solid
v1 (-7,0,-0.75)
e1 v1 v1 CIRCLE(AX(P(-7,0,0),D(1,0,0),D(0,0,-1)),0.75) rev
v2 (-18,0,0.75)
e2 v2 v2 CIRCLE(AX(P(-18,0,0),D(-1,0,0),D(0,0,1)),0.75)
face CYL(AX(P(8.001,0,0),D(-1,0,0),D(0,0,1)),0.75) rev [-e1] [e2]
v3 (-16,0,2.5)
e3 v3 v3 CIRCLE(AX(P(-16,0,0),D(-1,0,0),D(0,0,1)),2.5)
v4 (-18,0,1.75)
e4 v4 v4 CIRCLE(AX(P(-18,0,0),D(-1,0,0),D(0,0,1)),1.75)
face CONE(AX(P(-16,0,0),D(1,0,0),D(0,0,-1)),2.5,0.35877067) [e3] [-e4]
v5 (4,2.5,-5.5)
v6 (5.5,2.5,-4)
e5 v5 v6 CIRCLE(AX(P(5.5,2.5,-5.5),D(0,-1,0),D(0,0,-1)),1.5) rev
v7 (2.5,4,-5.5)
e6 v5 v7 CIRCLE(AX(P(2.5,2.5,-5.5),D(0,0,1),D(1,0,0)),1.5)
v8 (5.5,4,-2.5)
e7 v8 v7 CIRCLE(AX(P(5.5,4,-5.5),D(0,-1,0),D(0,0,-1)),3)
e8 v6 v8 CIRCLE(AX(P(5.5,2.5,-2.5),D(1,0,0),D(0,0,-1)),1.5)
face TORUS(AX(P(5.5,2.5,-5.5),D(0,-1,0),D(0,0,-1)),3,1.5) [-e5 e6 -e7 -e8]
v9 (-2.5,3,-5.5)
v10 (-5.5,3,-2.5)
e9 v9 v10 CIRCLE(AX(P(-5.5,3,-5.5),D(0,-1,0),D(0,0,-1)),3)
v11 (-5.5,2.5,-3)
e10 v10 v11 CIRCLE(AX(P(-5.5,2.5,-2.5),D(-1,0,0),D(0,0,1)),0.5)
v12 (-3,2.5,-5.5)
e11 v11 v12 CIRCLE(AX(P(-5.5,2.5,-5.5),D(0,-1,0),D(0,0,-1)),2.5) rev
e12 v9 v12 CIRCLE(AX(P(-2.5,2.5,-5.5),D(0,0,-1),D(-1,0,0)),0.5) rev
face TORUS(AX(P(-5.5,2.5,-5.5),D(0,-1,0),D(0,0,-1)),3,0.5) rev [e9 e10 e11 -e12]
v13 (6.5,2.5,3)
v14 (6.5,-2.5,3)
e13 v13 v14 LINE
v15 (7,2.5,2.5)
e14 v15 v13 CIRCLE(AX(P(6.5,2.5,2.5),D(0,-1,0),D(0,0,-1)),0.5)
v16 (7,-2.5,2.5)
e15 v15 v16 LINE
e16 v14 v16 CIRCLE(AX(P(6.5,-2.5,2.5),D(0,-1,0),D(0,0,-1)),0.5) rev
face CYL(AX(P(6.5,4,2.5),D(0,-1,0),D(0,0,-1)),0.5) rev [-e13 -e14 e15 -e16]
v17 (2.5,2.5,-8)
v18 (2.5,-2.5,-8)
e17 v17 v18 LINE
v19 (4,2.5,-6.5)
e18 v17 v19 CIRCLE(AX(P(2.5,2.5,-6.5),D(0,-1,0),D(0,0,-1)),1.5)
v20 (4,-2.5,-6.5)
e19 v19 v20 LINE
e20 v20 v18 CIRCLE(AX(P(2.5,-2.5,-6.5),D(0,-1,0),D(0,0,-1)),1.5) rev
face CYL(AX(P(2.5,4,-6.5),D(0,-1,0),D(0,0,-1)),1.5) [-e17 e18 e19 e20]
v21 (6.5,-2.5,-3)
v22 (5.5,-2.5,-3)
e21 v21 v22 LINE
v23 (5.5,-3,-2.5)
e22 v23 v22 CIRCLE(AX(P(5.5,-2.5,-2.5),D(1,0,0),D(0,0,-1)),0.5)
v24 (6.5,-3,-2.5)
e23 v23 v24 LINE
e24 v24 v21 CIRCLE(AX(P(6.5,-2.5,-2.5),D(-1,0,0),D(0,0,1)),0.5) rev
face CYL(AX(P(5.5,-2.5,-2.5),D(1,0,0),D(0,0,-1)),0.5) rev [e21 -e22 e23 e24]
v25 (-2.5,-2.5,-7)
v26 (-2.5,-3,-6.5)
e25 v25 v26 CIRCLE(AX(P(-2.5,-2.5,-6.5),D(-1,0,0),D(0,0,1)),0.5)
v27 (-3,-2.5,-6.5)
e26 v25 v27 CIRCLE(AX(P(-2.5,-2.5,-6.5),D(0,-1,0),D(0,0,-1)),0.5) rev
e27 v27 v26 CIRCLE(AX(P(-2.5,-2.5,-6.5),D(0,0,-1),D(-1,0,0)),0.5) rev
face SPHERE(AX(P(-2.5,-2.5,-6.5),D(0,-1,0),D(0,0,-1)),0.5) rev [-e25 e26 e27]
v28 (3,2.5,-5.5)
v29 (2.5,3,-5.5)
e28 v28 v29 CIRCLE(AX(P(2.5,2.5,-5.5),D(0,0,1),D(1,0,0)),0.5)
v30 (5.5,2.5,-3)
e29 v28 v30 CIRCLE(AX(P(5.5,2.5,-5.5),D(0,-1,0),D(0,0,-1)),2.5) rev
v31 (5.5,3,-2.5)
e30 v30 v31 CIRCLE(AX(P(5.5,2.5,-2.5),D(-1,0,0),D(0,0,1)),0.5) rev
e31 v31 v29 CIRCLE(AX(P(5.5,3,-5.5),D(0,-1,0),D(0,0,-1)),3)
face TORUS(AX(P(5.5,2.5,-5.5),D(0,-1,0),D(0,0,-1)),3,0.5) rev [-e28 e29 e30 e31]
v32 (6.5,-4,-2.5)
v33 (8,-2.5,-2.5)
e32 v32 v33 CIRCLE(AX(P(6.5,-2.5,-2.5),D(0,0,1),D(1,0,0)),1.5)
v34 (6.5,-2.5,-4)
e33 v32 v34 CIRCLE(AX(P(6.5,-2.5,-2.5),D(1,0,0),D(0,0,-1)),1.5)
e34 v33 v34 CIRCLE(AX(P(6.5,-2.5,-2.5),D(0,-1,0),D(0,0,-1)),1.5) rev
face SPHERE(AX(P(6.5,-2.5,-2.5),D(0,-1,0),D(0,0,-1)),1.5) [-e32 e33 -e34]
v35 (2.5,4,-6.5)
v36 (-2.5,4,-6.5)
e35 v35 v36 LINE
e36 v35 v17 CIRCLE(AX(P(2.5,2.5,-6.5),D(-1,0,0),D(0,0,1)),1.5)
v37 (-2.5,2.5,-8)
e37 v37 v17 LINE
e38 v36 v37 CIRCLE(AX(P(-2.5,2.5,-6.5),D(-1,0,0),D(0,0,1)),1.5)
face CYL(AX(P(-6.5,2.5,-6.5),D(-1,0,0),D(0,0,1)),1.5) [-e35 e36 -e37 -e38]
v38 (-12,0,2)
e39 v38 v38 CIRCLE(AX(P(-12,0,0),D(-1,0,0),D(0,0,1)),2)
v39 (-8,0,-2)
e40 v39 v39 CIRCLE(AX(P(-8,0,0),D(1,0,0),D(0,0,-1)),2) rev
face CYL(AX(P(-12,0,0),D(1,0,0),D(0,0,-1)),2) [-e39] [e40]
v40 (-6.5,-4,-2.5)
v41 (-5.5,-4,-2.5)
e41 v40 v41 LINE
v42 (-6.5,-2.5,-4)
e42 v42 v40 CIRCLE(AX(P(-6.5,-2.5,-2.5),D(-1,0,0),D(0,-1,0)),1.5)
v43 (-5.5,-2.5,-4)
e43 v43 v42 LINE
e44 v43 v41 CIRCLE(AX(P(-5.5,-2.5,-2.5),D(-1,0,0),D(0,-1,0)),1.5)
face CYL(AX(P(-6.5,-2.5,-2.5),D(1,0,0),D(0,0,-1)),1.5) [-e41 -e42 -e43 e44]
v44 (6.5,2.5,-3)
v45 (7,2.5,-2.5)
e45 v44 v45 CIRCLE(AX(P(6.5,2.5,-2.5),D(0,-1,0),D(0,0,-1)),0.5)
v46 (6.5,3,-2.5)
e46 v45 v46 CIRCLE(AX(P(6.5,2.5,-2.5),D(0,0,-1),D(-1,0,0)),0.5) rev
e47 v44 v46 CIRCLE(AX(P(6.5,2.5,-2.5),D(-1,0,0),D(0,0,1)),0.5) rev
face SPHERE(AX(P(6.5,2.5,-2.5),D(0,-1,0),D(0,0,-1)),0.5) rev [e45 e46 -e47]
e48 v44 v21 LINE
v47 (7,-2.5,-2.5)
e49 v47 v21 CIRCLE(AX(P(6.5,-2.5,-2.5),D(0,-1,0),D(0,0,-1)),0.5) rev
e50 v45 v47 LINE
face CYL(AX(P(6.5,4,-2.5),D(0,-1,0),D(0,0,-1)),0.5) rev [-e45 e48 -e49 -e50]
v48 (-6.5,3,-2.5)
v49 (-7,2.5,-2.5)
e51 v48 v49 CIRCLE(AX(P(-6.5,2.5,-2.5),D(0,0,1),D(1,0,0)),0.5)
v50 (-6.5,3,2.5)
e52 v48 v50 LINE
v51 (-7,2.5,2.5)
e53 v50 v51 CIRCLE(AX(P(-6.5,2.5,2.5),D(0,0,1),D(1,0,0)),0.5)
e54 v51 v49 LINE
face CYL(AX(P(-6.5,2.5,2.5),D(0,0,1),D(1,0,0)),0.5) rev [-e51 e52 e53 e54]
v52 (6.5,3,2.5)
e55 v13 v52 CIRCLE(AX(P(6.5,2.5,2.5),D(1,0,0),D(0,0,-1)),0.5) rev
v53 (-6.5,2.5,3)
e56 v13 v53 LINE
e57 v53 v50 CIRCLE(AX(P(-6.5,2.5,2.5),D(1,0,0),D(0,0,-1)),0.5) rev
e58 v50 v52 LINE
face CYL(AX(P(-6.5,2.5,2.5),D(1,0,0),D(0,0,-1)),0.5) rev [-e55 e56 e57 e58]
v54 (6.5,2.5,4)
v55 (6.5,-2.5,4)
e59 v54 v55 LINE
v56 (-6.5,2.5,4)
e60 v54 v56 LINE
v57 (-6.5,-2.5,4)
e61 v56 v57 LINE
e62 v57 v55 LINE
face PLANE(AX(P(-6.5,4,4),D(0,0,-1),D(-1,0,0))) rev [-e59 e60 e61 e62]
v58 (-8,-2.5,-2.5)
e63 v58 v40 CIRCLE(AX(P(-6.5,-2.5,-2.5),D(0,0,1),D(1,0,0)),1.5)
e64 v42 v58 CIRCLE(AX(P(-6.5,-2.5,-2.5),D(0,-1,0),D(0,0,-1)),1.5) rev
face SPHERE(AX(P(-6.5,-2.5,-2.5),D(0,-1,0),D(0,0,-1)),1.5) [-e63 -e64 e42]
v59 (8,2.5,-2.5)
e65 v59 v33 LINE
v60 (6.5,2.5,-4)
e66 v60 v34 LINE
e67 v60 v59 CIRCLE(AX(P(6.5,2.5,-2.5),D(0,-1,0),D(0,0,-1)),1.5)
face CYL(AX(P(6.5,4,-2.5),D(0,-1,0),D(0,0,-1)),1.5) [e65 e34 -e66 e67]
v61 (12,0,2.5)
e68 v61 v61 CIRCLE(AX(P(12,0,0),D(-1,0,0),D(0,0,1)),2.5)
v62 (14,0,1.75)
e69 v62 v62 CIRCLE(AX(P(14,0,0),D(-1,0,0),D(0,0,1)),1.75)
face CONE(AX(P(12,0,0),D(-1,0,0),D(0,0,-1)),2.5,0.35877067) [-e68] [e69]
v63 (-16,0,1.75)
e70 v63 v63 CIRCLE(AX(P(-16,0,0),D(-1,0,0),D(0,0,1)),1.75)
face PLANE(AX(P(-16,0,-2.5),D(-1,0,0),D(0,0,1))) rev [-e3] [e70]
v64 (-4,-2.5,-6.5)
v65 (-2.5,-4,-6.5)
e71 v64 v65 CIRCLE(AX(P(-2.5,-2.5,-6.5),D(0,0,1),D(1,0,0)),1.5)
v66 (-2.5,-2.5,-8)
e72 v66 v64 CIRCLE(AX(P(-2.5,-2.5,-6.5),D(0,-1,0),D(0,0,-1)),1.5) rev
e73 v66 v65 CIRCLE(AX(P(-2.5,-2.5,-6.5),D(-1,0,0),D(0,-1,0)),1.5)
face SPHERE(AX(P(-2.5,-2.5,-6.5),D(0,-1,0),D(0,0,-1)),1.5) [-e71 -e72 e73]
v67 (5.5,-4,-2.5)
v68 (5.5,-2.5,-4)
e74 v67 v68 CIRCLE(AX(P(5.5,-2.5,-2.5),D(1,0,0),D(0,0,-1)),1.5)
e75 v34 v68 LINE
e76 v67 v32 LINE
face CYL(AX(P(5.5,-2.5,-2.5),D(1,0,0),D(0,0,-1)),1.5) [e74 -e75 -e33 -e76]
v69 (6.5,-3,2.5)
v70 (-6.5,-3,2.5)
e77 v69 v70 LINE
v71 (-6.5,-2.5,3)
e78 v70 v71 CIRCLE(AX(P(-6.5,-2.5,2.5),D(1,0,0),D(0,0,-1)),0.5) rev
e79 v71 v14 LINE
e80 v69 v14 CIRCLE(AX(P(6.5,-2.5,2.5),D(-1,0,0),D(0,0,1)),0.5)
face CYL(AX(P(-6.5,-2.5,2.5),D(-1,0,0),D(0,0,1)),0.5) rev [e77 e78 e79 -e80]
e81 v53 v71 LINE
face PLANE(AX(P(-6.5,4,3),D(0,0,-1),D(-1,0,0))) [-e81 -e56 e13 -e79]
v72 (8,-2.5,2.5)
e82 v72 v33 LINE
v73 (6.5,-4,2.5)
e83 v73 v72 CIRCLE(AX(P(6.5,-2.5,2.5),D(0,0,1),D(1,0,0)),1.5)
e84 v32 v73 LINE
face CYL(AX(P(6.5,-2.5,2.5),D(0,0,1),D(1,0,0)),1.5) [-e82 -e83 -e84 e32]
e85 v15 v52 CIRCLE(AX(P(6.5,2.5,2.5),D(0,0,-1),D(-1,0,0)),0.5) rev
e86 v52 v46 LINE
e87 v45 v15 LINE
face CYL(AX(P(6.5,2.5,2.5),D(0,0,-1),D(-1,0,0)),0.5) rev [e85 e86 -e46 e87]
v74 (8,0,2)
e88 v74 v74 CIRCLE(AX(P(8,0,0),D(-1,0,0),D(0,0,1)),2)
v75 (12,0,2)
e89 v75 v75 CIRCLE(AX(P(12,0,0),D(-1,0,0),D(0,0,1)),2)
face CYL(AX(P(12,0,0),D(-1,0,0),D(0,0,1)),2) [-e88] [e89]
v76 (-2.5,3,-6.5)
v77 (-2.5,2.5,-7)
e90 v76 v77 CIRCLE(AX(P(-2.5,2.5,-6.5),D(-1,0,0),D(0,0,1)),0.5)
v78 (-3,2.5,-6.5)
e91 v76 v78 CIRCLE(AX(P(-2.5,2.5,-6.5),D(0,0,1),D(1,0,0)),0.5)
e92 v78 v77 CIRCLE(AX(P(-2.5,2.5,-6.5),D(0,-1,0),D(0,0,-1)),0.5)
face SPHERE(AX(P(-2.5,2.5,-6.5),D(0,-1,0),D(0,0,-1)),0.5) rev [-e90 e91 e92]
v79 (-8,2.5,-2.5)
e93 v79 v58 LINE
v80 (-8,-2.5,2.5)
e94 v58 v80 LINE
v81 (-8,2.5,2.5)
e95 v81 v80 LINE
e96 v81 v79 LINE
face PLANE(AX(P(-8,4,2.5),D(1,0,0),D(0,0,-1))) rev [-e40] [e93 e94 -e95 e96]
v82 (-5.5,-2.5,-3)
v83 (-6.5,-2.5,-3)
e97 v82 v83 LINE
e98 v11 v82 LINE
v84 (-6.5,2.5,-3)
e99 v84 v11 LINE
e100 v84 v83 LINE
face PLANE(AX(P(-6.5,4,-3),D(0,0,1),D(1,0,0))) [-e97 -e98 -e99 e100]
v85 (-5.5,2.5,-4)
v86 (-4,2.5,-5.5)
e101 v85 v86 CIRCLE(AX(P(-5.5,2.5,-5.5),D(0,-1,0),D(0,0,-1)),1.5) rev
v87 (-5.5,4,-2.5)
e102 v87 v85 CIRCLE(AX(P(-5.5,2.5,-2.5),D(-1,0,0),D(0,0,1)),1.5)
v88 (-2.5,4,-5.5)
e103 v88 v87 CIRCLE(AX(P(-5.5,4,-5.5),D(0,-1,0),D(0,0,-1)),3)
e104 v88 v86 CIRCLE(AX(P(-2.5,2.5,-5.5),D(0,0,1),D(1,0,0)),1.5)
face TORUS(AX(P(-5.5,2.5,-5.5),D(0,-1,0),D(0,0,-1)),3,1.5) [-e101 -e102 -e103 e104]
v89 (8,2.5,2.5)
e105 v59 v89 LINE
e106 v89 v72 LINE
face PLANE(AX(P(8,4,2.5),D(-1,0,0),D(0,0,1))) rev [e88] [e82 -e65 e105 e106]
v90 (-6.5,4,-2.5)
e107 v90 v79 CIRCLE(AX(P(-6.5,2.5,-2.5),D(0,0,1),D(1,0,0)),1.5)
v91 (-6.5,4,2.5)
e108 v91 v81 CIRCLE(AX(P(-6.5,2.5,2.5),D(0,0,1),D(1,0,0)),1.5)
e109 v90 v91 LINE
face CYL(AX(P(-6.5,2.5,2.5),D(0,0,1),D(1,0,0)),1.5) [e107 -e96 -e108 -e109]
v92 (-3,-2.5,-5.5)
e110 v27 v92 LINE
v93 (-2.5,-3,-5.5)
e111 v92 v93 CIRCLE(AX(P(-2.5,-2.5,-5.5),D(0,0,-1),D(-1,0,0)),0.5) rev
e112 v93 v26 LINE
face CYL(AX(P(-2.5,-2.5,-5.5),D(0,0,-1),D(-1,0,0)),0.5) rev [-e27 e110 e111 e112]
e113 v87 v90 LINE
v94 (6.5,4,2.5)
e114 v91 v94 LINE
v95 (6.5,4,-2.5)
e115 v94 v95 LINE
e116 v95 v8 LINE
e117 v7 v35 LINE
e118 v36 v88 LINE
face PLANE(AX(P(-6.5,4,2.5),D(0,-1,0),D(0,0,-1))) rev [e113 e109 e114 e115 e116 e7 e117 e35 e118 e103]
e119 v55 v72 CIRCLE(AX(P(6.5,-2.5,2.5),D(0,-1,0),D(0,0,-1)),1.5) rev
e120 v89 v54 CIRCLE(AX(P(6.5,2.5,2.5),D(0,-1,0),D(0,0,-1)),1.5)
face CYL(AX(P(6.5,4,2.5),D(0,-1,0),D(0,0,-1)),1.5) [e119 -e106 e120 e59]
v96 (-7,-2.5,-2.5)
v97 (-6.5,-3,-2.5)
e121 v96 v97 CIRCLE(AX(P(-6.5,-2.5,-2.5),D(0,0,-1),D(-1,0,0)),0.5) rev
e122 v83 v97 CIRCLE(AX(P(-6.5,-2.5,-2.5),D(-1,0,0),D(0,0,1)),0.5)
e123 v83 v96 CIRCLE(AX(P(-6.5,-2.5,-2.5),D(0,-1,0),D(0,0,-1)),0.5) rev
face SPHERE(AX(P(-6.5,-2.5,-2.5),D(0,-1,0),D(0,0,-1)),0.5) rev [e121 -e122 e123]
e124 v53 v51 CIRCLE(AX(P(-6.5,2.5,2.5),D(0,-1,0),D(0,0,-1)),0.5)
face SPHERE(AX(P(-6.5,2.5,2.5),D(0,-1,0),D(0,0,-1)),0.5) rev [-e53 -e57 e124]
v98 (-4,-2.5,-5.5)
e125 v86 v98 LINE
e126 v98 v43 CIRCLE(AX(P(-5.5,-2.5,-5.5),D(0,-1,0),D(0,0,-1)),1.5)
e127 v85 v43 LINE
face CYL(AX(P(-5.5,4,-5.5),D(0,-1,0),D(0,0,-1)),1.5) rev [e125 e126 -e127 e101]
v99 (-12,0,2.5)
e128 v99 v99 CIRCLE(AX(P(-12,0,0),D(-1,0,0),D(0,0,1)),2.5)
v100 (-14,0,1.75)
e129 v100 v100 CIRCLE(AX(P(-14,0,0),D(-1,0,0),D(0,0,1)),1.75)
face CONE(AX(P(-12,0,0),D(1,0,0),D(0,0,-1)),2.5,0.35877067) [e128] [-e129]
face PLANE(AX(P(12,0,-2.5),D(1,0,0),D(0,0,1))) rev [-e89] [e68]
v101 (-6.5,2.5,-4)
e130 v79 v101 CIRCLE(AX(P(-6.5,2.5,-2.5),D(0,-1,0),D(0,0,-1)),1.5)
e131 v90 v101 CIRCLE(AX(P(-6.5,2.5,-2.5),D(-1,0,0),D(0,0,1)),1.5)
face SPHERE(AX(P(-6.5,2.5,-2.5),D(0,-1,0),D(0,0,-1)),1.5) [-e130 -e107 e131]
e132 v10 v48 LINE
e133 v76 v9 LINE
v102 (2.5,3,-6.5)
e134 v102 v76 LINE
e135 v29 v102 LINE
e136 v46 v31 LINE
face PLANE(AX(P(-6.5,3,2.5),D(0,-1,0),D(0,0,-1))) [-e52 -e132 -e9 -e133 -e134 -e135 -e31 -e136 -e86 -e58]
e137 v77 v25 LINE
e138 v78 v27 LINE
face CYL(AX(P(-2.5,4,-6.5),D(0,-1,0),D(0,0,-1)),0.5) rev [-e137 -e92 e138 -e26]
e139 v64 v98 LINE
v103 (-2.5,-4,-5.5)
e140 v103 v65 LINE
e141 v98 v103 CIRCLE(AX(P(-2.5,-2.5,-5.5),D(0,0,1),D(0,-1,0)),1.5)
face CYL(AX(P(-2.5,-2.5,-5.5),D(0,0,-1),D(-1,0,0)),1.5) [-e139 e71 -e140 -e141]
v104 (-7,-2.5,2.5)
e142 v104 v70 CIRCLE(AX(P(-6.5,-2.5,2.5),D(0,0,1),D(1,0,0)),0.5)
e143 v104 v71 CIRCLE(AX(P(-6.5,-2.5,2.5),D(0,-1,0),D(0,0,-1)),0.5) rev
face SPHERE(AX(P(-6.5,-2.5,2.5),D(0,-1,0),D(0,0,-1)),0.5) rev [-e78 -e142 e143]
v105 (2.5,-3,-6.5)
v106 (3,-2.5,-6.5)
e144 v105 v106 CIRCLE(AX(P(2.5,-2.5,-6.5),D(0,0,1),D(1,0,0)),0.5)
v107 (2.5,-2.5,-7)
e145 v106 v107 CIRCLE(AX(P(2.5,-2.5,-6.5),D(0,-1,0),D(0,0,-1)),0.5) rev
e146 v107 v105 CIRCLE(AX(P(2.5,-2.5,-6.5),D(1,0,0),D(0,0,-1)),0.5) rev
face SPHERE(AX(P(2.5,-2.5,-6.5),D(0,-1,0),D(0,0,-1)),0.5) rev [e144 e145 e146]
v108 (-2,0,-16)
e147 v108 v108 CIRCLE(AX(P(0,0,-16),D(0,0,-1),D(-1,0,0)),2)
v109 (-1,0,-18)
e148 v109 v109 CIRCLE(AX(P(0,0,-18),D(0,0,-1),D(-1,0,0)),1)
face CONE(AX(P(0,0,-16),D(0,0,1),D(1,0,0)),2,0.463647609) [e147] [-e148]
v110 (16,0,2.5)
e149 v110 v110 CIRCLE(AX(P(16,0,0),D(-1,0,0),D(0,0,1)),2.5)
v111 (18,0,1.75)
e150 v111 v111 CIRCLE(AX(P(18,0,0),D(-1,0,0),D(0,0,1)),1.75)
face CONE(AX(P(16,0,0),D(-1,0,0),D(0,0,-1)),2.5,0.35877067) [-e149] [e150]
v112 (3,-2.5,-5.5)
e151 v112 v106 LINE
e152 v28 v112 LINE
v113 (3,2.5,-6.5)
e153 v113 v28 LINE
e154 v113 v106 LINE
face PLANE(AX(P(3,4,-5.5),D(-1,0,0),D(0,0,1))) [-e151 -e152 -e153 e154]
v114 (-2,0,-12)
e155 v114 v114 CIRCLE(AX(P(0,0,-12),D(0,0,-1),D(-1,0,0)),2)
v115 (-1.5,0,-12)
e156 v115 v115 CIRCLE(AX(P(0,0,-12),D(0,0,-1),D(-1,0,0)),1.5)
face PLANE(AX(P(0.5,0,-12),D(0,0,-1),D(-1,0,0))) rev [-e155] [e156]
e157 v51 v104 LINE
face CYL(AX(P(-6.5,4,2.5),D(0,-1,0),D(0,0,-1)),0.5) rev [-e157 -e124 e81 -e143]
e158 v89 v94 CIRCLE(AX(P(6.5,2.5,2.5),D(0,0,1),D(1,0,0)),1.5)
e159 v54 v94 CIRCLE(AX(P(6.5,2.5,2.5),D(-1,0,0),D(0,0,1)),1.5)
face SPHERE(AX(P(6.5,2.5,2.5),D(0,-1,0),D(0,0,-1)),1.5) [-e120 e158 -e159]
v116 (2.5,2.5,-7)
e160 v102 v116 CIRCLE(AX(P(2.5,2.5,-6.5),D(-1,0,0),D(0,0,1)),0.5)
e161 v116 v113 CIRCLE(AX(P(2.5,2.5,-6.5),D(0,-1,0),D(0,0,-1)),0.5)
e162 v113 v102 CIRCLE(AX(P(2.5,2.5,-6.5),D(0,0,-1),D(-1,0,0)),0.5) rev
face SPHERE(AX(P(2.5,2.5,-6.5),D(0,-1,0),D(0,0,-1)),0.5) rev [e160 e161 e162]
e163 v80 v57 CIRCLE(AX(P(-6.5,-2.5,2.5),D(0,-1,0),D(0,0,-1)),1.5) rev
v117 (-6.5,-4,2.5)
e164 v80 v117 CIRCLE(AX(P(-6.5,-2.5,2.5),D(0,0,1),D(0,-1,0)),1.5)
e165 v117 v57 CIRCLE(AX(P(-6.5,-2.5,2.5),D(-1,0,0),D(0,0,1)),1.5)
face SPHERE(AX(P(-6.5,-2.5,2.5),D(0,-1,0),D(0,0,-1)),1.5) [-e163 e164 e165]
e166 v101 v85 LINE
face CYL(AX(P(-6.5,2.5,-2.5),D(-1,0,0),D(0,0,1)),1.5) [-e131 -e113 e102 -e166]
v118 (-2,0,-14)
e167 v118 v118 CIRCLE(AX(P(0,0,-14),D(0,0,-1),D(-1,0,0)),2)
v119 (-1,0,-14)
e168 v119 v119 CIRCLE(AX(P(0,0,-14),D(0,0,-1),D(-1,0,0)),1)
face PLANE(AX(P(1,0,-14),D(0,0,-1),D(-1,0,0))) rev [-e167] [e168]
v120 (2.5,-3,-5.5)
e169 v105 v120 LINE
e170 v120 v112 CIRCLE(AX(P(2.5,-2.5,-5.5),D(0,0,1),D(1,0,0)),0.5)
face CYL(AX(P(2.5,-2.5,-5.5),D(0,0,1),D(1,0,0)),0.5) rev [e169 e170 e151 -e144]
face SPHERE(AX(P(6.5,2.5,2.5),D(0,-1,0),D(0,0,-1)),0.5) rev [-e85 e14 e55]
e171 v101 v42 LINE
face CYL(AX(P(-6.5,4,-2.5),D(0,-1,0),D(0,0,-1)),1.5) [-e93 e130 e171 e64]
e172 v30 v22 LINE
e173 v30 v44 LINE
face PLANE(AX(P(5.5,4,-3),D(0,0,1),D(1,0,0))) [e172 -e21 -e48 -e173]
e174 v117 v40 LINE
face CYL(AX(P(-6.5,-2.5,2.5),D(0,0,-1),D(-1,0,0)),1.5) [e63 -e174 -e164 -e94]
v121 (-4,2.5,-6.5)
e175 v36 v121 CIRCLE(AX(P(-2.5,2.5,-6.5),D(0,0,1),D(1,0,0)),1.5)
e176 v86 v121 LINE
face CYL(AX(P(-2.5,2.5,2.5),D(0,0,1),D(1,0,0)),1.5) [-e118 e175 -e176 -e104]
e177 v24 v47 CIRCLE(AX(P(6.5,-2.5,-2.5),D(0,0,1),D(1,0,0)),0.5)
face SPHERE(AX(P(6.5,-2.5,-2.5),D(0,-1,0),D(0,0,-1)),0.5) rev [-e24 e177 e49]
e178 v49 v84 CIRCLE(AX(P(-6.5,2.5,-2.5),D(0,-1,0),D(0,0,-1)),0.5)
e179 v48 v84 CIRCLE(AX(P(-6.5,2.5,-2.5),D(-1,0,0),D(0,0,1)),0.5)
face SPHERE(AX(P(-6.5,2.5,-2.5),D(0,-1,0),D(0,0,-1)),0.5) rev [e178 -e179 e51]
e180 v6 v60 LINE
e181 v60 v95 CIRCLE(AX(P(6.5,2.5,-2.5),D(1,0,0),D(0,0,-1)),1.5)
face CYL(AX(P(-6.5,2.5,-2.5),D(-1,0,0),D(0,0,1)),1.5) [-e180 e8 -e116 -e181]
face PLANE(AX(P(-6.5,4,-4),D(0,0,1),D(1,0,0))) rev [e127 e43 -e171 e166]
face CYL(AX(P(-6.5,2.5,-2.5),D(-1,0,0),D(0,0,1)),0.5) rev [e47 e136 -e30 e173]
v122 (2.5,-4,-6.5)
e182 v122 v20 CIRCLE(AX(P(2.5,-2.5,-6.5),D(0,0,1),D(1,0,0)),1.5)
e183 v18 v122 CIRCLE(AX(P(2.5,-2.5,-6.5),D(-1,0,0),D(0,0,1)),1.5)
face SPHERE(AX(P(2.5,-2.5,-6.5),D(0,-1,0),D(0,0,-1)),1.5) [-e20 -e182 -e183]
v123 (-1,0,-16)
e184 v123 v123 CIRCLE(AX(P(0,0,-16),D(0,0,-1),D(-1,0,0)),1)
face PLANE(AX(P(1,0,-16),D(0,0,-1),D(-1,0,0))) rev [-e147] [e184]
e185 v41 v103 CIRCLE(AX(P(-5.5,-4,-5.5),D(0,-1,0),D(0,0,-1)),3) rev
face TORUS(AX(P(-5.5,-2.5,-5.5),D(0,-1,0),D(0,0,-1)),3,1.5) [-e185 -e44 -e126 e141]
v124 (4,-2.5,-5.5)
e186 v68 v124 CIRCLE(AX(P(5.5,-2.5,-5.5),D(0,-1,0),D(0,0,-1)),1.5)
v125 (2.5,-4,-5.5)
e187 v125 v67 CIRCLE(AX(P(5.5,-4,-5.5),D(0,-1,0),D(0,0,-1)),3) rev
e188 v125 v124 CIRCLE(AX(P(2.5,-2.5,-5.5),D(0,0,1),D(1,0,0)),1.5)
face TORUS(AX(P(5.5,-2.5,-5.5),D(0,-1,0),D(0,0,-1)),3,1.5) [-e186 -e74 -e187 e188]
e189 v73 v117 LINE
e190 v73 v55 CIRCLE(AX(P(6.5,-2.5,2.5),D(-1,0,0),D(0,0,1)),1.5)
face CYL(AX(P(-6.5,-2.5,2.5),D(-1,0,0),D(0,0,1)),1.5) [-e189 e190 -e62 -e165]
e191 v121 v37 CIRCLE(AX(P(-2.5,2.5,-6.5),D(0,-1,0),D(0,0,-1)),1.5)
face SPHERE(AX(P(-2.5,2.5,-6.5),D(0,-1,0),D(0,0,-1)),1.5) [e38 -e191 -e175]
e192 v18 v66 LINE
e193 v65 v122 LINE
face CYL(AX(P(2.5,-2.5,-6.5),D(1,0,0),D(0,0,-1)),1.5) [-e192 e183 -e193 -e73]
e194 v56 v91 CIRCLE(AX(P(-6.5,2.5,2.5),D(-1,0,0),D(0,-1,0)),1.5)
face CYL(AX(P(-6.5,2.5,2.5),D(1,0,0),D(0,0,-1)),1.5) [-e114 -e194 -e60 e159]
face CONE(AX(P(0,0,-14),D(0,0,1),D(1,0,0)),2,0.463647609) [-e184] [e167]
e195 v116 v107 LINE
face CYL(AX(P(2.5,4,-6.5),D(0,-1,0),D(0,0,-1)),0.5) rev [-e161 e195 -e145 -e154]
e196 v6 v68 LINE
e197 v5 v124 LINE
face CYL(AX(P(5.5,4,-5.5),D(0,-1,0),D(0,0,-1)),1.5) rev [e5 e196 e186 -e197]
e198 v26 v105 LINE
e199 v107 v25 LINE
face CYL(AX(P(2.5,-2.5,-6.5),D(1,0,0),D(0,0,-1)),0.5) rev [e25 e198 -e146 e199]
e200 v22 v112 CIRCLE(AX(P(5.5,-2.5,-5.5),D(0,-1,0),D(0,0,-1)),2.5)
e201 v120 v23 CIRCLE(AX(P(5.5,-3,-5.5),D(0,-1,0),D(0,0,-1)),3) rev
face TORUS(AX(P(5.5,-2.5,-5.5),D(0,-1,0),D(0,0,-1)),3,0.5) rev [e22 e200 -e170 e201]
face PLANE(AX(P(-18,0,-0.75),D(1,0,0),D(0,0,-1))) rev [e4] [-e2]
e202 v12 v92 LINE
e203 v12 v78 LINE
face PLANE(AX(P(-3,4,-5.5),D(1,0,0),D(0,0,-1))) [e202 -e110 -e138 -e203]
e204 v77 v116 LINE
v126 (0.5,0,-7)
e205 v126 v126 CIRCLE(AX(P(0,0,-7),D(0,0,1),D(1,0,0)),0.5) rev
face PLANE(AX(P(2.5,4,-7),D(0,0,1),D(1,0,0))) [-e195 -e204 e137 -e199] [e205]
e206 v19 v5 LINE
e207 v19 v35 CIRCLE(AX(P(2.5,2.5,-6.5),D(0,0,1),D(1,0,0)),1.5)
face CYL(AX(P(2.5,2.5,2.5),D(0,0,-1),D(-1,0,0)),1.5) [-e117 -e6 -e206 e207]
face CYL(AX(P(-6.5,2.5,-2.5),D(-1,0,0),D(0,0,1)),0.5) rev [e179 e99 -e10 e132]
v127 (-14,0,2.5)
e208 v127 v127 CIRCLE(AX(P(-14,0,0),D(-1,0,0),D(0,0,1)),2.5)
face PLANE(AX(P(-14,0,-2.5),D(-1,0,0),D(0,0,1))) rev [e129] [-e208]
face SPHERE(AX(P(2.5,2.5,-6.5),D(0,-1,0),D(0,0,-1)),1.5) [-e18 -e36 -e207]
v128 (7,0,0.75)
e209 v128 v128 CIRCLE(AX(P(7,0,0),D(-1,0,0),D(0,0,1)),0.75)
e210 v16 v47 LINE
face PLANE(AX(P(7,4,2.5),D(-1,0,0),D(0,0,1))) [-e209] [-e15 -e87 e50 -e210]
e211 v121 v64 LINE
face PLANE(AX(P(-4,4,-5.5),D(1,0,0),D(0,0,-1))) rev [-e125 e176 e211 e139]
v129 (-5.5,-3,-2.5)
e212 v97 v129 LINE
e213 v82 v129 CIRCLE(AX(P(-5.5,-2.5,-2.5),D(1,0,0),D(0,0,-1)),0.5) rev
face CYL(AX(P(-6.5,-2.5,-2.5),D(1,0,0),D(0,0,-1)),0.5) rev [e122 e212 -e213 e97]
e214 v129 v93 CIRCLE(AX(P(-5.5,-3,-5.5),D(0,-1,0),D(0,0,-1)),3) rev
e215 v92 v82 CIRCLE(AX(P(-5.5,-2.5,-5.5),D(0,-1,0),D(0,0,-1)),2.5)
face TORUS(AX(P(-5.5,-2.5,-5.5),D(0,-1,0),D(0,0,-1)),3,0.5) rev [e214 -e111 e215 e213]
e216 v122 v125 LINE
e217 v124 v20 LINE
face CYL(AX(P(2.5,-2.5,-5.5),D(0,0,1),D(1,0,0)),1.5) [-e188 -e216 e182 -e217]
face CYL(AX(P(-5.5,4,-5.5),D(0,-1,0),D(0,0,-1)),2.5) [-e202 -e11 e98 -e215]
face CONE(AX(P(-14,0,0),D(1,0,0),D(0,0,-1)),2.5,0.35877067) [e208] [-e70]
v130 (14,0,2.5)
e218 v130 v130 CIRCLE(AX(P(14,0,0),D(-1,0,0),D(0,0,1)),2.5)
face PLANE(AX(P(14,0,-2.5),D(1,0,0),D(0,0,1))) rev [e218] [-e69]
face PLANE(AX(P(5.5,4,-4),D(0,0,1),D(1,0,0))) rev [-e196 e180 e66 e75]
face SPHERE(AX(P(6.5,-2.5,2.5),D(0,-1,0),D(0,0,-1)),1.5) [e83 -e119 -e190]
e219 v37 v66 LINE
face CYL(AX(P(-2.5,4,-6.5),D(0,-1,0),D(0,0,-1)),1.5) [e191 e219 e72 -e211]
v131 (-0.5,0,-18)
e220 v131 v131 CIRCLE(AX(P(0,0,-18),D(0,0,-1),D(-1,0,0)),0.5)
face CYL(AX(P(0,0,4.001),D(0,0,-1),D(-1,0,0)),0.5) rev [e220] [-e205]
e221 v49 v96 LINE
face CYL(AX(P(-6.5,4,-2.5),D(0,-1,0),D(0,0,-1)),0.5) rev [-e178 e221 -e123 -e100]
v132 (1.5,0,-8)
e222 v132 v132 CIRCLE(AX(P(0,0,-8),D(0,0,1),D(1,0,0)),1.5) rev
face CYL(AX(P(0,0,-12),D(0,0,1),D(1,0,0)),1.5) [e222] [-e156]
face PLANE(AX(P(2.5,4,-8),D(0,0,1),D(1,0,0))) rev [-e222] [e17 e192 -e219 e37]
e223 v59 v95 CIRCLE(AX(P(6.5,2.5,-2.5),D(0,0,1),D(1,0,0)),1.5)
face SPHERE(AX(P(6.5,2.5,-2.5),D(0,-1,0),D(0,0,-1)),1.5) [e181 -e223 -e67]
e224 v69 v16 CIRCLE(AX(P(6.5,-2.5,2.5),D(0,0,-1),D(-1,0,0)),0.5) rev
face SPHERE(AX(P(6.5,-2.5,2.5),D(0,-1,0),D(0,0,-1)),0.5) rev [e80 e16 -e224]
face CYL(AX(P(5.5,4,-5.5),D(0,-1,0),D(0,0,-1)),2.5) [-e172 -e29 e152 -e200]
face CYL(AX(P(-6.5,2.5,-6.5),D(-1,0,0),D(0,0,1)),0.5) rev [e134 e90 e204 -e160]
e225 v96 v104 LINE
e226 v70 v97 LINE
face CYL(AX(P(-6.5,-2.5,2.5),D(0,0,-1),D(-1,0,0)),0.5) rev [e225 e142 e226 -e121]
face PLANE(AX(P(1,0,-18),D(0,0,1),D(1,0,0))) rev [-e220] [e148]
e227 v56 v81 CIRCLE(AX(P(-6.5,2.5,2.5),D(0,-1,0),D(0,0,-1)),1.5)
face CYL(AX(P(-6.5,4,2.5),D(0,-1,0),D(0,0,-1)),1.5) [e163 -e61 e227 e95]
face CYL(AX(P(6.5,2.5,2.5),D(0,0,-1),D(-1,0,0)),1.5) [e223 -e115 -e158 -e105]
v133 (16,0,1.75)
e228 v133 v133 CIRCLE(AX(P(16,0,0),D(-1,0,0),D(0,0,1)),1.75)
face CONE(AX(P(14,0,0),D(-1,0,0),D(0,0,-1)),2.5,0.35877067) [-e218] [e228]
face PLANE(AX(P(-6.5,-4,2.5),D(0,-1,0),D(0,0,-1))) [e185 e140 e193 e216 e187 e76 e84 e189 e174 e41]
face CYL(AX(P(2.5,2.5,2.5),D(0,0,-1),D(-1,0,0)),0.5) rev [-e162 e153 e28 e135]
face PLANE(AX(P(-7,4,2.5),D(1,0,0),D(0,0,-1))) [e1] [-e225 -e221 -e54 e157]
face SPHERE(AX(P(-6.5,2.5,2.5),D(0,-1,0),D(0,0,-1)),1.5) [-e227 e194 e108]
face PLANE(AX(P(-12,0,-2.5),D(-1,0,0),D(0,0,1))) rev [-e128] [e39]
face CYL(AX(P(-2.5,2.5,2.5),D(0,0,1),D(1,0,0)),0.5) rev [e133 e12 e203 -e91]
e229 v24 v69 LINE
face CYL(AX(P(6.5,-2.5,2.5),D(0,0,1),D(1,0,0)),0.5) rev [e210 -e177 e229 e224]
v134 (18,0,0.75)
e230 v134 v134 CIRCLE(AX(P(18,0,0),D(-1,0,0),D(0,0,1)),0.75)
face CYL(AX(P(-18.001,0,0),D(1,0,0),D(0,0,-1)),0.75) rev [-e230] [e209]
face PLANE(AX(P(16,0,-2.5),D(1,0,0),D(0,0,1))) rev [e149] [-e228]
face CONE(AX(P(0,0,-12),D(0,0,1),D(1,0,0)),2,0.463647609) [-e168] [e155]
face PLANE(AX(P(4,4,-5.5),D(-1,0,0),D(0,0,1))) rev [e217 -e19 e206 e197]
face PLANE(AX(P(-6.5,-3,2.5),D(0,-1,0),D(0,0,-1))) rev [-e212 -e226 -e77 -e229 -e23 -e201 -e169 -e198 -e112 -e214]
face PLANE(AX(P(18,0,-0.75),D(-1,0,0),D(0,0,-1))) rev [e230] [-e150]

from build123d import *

# Parameters (mm, degrees)
BOSS_EXTRUDE1_DEPTH = 4
FILLET1_R           = 1.5
SHELL1_T            = 1
SKETCH2_R           = 2
BOSS_EXTRUDE2_DEPTH = 4
CUT_EXTRUDE1_REACH  = 23.909
SKETCH4_R           = 0.75
SKETCH5_R           = 1.5
BOSS_EXTRUDE3_DEPTH = 4
CUT_EXTRUDE2_REACH  = 26.413
SKETCH6_R           = 0.5


with BuildPart() as part:
    # Sketch1 → Boss-Extrude1 (new, symmetric)
    with BuildSketch(Plane(origin=(0, 0, 0), x_dir=(1, 0, 0), z_dir=(0, 1, 0))):
        with BuildLine():
            Line((-6.5, -4), (6.5, -4))
            ThreePointArc((6.5, -4), (7.560660172, -3.560660172), (8, -2.5))
            Line((8, -2.5), (8, 2.5))
            ThreePointArc((8, 2.5), (7.560660172, 3.560660172), (6.5, 4))
            Line((6.5, 4), (5.5, 4))
            ThreePointArc((5.5, 4), (4.439339828, 4.439339828), (4, 5.5))
            Line((4, 5.5), (4, 6.5))
            ThreePointArc((4, 6.5), (3.560660172, 7.560660172), (2.5, 8))
            Line((2.5, 8), (-2.5, 8))
            ThreePointArc((-2.5, 8), (-3.560660172, 7.560660172), (-4, 6.5))
            Line((-4, 6.5), (-4, 5.5))
            ThreePointArc((-4, 5.5), (-4.439339828, 4.439339828), (-5.5, 4))
            Line((-5.5, 4), (-6.5, 4))
            ThreePointArc((-6.5, 4), (-7.560660172, 3.560660172), (-8, 2.5))
            Line((-8, 2.5), (-8, -2.5))
            ThreePointArc((-8, -2.5), (-7.560660172, -3.560660172), (-6.5, -4))
        make_face()
    extrude(amount=BOSS_EXTRUDE1_DEPTH, both=True)

    # Fillet1
    fillet1_edges = [part.edges().sort_by_distance(p)[0] for p in [
        (-7.560660172, -4, 3.560660172),
        (-8, -4, 0),
        (-7.560660172, -4, -3.560660172),
        (-6, -4, -4),
        (-4.439339828, -4, -4.439339828),
        (-4, -4, -6),
        (-3.560660172, -4, -7.560660172),
        (0, -4, -8),
        (3.560660172, -4, -7.560660172),
        (4, -4, -6),
        (4.439339828, -4, -4.439339828),
        (6, -4, -4),
        (7.560660172, -4, -3.560660172),
        (8, -4, 0),
        (7.560660172, -4, 3.560660172),
        (-7.560660172, 4, 3.560660172),
        (-8, 4, 0),
        (-7.560660172, 4, -3.560660172),
        (-6, 4, -4),
        (-4.439339828, 4, -4.439339828),
        (-4, 4, -6),
        (-3.560660172, 4, -7.560660172),
        (0, 4, -8),
        (3.560660172, 4, -7.560660172),
        (4, 4, -6),
        (4.439339828, 4, -4.439339828),
        (6, 4, -4),
        (7.560660172, 4, -3.560660172),
        (8, 4, 0),
        (7.560660172, 4, 3.560660172),
        (0, -4, 4),
        (0, 4, 4),
    ]]
    fillet(fillet1_edges, radius=FILLET1_R)

    # Shell1 (no face opened: a closed hollow body)
    add(offset(amount=-SHELL1_T, mode=Mode.PRIVATE), mode=Mode.SUBTRACT)

    # Sketch2 → Boss-Extrude2 (add)
    with BuildSketch(Plane.ZY.offset(8)):
        Circle(SKETCH2_R)
    boss_extrude2 = extrude(amount=BOSS_EXTRUDE2_DEPTH)

    # Sketch4 → Cut-Extrude1 (cut, up to next)
    with BuildSketch(Plane.ZY.offset(12), mode=Mode.PRIVATE) as cut_extrude1_sk1:
        Circle(SKETCH4_R)
    cut_extrude1_tool1 = extrude(cut_extrude1_sk1.sketch, amount=-CUT_EXTRUDE1_REACH, mode=Mode.PRIVATE) & part.part
    cut_extrude1 = cut_extrude1_tool1.solids().sort_by_distance((-12, 0, 0))[0]
    add(cut_extrude1, mode=Mode.SUBTRACT)

    # Sketch3 → Revolve1 (revolve)
    with BuildSketch(Plane(origin=(0, 0, 0), x_dir=(1, 0, 0), z_dir=(0, 1, 0))):
        Polygon((-12, 0.75), (-18, 0.75), (-18, 1.75), (-16, 2.5), (-16, 1.75), (-14, 2.5), (-14, 1.75), (-12, 2.5), align=None)
    revolve1 = revolve(axis=Axis((-12, 0, 0), (1, 0, 0)))

    # Mirror1: Boss-Extrude2, Cut-Extrude1, Revolve1 across plane
    add(boss_extrude2.mirror(Plane(origin=(0, 0, 0), x_dir=(0, 0, 1), z_dir=(1, 0, 0))))
    add(cut_extrude1.mirror(Plane(origin=(0, 0, 0), x_dir=(0, 0, 1), z_dir=(1, 0, 0))), mode=Mode.SUBTRACT)
    add(revolve1.mirror(Plane(origin=(0, 0, 0), x_dir=(0, 0, 1), z_dir=(1, 0, 0))))

    # Sketch5 → Boss-Extrude3 (add)
    with BuildSketch(Plane(origin=(0, 0, -8), x_dir=(-1, 0, 0), z_dir=(0, 0, -1))):
        Circle(SKETCH5_R)
    extrude(amount=BOSS_EXTRUDE3_DEPTH)

    # Sketch6 → Cut-Extrude2 (cut, up to next)
    with BuildSketch(Plane(origin=(0, 0, -12), x_dir=(-1, 0, 0), z_dir=(0, 0, -1)), mode=Mode.PRIVATE) as cut_extrude2_sk1:
        Circle(SKETCH6_R)
    cut_extrude2_tool1 = extrude(cut_extrude2_sk1.sketch, amount=-CUT_EXTRUDE2_REACH, mode=Mode.PRIVATE) & part.part
    add(cut_extrude2_tool1.solids().sort_by_distance((0, 0, -12))[0], mode=Mode.SUBTRACT)

    # Sketch7 → Revolve2 (revolve)
    with BuildSketch(Plane(origin=(0, 0, 0), x_dir=(1, 0, 0), z_dir=(0, 1, 0))):
        Polygon((0.5, 12), (2, 12), (1, 14), (2, 14), (1, 16), (2, 16), (1, 18), (0.5, 18), align=None)
    revolve(axis=Axis((0, 0, -12), (0, 0, 1)))


solid = part.part
